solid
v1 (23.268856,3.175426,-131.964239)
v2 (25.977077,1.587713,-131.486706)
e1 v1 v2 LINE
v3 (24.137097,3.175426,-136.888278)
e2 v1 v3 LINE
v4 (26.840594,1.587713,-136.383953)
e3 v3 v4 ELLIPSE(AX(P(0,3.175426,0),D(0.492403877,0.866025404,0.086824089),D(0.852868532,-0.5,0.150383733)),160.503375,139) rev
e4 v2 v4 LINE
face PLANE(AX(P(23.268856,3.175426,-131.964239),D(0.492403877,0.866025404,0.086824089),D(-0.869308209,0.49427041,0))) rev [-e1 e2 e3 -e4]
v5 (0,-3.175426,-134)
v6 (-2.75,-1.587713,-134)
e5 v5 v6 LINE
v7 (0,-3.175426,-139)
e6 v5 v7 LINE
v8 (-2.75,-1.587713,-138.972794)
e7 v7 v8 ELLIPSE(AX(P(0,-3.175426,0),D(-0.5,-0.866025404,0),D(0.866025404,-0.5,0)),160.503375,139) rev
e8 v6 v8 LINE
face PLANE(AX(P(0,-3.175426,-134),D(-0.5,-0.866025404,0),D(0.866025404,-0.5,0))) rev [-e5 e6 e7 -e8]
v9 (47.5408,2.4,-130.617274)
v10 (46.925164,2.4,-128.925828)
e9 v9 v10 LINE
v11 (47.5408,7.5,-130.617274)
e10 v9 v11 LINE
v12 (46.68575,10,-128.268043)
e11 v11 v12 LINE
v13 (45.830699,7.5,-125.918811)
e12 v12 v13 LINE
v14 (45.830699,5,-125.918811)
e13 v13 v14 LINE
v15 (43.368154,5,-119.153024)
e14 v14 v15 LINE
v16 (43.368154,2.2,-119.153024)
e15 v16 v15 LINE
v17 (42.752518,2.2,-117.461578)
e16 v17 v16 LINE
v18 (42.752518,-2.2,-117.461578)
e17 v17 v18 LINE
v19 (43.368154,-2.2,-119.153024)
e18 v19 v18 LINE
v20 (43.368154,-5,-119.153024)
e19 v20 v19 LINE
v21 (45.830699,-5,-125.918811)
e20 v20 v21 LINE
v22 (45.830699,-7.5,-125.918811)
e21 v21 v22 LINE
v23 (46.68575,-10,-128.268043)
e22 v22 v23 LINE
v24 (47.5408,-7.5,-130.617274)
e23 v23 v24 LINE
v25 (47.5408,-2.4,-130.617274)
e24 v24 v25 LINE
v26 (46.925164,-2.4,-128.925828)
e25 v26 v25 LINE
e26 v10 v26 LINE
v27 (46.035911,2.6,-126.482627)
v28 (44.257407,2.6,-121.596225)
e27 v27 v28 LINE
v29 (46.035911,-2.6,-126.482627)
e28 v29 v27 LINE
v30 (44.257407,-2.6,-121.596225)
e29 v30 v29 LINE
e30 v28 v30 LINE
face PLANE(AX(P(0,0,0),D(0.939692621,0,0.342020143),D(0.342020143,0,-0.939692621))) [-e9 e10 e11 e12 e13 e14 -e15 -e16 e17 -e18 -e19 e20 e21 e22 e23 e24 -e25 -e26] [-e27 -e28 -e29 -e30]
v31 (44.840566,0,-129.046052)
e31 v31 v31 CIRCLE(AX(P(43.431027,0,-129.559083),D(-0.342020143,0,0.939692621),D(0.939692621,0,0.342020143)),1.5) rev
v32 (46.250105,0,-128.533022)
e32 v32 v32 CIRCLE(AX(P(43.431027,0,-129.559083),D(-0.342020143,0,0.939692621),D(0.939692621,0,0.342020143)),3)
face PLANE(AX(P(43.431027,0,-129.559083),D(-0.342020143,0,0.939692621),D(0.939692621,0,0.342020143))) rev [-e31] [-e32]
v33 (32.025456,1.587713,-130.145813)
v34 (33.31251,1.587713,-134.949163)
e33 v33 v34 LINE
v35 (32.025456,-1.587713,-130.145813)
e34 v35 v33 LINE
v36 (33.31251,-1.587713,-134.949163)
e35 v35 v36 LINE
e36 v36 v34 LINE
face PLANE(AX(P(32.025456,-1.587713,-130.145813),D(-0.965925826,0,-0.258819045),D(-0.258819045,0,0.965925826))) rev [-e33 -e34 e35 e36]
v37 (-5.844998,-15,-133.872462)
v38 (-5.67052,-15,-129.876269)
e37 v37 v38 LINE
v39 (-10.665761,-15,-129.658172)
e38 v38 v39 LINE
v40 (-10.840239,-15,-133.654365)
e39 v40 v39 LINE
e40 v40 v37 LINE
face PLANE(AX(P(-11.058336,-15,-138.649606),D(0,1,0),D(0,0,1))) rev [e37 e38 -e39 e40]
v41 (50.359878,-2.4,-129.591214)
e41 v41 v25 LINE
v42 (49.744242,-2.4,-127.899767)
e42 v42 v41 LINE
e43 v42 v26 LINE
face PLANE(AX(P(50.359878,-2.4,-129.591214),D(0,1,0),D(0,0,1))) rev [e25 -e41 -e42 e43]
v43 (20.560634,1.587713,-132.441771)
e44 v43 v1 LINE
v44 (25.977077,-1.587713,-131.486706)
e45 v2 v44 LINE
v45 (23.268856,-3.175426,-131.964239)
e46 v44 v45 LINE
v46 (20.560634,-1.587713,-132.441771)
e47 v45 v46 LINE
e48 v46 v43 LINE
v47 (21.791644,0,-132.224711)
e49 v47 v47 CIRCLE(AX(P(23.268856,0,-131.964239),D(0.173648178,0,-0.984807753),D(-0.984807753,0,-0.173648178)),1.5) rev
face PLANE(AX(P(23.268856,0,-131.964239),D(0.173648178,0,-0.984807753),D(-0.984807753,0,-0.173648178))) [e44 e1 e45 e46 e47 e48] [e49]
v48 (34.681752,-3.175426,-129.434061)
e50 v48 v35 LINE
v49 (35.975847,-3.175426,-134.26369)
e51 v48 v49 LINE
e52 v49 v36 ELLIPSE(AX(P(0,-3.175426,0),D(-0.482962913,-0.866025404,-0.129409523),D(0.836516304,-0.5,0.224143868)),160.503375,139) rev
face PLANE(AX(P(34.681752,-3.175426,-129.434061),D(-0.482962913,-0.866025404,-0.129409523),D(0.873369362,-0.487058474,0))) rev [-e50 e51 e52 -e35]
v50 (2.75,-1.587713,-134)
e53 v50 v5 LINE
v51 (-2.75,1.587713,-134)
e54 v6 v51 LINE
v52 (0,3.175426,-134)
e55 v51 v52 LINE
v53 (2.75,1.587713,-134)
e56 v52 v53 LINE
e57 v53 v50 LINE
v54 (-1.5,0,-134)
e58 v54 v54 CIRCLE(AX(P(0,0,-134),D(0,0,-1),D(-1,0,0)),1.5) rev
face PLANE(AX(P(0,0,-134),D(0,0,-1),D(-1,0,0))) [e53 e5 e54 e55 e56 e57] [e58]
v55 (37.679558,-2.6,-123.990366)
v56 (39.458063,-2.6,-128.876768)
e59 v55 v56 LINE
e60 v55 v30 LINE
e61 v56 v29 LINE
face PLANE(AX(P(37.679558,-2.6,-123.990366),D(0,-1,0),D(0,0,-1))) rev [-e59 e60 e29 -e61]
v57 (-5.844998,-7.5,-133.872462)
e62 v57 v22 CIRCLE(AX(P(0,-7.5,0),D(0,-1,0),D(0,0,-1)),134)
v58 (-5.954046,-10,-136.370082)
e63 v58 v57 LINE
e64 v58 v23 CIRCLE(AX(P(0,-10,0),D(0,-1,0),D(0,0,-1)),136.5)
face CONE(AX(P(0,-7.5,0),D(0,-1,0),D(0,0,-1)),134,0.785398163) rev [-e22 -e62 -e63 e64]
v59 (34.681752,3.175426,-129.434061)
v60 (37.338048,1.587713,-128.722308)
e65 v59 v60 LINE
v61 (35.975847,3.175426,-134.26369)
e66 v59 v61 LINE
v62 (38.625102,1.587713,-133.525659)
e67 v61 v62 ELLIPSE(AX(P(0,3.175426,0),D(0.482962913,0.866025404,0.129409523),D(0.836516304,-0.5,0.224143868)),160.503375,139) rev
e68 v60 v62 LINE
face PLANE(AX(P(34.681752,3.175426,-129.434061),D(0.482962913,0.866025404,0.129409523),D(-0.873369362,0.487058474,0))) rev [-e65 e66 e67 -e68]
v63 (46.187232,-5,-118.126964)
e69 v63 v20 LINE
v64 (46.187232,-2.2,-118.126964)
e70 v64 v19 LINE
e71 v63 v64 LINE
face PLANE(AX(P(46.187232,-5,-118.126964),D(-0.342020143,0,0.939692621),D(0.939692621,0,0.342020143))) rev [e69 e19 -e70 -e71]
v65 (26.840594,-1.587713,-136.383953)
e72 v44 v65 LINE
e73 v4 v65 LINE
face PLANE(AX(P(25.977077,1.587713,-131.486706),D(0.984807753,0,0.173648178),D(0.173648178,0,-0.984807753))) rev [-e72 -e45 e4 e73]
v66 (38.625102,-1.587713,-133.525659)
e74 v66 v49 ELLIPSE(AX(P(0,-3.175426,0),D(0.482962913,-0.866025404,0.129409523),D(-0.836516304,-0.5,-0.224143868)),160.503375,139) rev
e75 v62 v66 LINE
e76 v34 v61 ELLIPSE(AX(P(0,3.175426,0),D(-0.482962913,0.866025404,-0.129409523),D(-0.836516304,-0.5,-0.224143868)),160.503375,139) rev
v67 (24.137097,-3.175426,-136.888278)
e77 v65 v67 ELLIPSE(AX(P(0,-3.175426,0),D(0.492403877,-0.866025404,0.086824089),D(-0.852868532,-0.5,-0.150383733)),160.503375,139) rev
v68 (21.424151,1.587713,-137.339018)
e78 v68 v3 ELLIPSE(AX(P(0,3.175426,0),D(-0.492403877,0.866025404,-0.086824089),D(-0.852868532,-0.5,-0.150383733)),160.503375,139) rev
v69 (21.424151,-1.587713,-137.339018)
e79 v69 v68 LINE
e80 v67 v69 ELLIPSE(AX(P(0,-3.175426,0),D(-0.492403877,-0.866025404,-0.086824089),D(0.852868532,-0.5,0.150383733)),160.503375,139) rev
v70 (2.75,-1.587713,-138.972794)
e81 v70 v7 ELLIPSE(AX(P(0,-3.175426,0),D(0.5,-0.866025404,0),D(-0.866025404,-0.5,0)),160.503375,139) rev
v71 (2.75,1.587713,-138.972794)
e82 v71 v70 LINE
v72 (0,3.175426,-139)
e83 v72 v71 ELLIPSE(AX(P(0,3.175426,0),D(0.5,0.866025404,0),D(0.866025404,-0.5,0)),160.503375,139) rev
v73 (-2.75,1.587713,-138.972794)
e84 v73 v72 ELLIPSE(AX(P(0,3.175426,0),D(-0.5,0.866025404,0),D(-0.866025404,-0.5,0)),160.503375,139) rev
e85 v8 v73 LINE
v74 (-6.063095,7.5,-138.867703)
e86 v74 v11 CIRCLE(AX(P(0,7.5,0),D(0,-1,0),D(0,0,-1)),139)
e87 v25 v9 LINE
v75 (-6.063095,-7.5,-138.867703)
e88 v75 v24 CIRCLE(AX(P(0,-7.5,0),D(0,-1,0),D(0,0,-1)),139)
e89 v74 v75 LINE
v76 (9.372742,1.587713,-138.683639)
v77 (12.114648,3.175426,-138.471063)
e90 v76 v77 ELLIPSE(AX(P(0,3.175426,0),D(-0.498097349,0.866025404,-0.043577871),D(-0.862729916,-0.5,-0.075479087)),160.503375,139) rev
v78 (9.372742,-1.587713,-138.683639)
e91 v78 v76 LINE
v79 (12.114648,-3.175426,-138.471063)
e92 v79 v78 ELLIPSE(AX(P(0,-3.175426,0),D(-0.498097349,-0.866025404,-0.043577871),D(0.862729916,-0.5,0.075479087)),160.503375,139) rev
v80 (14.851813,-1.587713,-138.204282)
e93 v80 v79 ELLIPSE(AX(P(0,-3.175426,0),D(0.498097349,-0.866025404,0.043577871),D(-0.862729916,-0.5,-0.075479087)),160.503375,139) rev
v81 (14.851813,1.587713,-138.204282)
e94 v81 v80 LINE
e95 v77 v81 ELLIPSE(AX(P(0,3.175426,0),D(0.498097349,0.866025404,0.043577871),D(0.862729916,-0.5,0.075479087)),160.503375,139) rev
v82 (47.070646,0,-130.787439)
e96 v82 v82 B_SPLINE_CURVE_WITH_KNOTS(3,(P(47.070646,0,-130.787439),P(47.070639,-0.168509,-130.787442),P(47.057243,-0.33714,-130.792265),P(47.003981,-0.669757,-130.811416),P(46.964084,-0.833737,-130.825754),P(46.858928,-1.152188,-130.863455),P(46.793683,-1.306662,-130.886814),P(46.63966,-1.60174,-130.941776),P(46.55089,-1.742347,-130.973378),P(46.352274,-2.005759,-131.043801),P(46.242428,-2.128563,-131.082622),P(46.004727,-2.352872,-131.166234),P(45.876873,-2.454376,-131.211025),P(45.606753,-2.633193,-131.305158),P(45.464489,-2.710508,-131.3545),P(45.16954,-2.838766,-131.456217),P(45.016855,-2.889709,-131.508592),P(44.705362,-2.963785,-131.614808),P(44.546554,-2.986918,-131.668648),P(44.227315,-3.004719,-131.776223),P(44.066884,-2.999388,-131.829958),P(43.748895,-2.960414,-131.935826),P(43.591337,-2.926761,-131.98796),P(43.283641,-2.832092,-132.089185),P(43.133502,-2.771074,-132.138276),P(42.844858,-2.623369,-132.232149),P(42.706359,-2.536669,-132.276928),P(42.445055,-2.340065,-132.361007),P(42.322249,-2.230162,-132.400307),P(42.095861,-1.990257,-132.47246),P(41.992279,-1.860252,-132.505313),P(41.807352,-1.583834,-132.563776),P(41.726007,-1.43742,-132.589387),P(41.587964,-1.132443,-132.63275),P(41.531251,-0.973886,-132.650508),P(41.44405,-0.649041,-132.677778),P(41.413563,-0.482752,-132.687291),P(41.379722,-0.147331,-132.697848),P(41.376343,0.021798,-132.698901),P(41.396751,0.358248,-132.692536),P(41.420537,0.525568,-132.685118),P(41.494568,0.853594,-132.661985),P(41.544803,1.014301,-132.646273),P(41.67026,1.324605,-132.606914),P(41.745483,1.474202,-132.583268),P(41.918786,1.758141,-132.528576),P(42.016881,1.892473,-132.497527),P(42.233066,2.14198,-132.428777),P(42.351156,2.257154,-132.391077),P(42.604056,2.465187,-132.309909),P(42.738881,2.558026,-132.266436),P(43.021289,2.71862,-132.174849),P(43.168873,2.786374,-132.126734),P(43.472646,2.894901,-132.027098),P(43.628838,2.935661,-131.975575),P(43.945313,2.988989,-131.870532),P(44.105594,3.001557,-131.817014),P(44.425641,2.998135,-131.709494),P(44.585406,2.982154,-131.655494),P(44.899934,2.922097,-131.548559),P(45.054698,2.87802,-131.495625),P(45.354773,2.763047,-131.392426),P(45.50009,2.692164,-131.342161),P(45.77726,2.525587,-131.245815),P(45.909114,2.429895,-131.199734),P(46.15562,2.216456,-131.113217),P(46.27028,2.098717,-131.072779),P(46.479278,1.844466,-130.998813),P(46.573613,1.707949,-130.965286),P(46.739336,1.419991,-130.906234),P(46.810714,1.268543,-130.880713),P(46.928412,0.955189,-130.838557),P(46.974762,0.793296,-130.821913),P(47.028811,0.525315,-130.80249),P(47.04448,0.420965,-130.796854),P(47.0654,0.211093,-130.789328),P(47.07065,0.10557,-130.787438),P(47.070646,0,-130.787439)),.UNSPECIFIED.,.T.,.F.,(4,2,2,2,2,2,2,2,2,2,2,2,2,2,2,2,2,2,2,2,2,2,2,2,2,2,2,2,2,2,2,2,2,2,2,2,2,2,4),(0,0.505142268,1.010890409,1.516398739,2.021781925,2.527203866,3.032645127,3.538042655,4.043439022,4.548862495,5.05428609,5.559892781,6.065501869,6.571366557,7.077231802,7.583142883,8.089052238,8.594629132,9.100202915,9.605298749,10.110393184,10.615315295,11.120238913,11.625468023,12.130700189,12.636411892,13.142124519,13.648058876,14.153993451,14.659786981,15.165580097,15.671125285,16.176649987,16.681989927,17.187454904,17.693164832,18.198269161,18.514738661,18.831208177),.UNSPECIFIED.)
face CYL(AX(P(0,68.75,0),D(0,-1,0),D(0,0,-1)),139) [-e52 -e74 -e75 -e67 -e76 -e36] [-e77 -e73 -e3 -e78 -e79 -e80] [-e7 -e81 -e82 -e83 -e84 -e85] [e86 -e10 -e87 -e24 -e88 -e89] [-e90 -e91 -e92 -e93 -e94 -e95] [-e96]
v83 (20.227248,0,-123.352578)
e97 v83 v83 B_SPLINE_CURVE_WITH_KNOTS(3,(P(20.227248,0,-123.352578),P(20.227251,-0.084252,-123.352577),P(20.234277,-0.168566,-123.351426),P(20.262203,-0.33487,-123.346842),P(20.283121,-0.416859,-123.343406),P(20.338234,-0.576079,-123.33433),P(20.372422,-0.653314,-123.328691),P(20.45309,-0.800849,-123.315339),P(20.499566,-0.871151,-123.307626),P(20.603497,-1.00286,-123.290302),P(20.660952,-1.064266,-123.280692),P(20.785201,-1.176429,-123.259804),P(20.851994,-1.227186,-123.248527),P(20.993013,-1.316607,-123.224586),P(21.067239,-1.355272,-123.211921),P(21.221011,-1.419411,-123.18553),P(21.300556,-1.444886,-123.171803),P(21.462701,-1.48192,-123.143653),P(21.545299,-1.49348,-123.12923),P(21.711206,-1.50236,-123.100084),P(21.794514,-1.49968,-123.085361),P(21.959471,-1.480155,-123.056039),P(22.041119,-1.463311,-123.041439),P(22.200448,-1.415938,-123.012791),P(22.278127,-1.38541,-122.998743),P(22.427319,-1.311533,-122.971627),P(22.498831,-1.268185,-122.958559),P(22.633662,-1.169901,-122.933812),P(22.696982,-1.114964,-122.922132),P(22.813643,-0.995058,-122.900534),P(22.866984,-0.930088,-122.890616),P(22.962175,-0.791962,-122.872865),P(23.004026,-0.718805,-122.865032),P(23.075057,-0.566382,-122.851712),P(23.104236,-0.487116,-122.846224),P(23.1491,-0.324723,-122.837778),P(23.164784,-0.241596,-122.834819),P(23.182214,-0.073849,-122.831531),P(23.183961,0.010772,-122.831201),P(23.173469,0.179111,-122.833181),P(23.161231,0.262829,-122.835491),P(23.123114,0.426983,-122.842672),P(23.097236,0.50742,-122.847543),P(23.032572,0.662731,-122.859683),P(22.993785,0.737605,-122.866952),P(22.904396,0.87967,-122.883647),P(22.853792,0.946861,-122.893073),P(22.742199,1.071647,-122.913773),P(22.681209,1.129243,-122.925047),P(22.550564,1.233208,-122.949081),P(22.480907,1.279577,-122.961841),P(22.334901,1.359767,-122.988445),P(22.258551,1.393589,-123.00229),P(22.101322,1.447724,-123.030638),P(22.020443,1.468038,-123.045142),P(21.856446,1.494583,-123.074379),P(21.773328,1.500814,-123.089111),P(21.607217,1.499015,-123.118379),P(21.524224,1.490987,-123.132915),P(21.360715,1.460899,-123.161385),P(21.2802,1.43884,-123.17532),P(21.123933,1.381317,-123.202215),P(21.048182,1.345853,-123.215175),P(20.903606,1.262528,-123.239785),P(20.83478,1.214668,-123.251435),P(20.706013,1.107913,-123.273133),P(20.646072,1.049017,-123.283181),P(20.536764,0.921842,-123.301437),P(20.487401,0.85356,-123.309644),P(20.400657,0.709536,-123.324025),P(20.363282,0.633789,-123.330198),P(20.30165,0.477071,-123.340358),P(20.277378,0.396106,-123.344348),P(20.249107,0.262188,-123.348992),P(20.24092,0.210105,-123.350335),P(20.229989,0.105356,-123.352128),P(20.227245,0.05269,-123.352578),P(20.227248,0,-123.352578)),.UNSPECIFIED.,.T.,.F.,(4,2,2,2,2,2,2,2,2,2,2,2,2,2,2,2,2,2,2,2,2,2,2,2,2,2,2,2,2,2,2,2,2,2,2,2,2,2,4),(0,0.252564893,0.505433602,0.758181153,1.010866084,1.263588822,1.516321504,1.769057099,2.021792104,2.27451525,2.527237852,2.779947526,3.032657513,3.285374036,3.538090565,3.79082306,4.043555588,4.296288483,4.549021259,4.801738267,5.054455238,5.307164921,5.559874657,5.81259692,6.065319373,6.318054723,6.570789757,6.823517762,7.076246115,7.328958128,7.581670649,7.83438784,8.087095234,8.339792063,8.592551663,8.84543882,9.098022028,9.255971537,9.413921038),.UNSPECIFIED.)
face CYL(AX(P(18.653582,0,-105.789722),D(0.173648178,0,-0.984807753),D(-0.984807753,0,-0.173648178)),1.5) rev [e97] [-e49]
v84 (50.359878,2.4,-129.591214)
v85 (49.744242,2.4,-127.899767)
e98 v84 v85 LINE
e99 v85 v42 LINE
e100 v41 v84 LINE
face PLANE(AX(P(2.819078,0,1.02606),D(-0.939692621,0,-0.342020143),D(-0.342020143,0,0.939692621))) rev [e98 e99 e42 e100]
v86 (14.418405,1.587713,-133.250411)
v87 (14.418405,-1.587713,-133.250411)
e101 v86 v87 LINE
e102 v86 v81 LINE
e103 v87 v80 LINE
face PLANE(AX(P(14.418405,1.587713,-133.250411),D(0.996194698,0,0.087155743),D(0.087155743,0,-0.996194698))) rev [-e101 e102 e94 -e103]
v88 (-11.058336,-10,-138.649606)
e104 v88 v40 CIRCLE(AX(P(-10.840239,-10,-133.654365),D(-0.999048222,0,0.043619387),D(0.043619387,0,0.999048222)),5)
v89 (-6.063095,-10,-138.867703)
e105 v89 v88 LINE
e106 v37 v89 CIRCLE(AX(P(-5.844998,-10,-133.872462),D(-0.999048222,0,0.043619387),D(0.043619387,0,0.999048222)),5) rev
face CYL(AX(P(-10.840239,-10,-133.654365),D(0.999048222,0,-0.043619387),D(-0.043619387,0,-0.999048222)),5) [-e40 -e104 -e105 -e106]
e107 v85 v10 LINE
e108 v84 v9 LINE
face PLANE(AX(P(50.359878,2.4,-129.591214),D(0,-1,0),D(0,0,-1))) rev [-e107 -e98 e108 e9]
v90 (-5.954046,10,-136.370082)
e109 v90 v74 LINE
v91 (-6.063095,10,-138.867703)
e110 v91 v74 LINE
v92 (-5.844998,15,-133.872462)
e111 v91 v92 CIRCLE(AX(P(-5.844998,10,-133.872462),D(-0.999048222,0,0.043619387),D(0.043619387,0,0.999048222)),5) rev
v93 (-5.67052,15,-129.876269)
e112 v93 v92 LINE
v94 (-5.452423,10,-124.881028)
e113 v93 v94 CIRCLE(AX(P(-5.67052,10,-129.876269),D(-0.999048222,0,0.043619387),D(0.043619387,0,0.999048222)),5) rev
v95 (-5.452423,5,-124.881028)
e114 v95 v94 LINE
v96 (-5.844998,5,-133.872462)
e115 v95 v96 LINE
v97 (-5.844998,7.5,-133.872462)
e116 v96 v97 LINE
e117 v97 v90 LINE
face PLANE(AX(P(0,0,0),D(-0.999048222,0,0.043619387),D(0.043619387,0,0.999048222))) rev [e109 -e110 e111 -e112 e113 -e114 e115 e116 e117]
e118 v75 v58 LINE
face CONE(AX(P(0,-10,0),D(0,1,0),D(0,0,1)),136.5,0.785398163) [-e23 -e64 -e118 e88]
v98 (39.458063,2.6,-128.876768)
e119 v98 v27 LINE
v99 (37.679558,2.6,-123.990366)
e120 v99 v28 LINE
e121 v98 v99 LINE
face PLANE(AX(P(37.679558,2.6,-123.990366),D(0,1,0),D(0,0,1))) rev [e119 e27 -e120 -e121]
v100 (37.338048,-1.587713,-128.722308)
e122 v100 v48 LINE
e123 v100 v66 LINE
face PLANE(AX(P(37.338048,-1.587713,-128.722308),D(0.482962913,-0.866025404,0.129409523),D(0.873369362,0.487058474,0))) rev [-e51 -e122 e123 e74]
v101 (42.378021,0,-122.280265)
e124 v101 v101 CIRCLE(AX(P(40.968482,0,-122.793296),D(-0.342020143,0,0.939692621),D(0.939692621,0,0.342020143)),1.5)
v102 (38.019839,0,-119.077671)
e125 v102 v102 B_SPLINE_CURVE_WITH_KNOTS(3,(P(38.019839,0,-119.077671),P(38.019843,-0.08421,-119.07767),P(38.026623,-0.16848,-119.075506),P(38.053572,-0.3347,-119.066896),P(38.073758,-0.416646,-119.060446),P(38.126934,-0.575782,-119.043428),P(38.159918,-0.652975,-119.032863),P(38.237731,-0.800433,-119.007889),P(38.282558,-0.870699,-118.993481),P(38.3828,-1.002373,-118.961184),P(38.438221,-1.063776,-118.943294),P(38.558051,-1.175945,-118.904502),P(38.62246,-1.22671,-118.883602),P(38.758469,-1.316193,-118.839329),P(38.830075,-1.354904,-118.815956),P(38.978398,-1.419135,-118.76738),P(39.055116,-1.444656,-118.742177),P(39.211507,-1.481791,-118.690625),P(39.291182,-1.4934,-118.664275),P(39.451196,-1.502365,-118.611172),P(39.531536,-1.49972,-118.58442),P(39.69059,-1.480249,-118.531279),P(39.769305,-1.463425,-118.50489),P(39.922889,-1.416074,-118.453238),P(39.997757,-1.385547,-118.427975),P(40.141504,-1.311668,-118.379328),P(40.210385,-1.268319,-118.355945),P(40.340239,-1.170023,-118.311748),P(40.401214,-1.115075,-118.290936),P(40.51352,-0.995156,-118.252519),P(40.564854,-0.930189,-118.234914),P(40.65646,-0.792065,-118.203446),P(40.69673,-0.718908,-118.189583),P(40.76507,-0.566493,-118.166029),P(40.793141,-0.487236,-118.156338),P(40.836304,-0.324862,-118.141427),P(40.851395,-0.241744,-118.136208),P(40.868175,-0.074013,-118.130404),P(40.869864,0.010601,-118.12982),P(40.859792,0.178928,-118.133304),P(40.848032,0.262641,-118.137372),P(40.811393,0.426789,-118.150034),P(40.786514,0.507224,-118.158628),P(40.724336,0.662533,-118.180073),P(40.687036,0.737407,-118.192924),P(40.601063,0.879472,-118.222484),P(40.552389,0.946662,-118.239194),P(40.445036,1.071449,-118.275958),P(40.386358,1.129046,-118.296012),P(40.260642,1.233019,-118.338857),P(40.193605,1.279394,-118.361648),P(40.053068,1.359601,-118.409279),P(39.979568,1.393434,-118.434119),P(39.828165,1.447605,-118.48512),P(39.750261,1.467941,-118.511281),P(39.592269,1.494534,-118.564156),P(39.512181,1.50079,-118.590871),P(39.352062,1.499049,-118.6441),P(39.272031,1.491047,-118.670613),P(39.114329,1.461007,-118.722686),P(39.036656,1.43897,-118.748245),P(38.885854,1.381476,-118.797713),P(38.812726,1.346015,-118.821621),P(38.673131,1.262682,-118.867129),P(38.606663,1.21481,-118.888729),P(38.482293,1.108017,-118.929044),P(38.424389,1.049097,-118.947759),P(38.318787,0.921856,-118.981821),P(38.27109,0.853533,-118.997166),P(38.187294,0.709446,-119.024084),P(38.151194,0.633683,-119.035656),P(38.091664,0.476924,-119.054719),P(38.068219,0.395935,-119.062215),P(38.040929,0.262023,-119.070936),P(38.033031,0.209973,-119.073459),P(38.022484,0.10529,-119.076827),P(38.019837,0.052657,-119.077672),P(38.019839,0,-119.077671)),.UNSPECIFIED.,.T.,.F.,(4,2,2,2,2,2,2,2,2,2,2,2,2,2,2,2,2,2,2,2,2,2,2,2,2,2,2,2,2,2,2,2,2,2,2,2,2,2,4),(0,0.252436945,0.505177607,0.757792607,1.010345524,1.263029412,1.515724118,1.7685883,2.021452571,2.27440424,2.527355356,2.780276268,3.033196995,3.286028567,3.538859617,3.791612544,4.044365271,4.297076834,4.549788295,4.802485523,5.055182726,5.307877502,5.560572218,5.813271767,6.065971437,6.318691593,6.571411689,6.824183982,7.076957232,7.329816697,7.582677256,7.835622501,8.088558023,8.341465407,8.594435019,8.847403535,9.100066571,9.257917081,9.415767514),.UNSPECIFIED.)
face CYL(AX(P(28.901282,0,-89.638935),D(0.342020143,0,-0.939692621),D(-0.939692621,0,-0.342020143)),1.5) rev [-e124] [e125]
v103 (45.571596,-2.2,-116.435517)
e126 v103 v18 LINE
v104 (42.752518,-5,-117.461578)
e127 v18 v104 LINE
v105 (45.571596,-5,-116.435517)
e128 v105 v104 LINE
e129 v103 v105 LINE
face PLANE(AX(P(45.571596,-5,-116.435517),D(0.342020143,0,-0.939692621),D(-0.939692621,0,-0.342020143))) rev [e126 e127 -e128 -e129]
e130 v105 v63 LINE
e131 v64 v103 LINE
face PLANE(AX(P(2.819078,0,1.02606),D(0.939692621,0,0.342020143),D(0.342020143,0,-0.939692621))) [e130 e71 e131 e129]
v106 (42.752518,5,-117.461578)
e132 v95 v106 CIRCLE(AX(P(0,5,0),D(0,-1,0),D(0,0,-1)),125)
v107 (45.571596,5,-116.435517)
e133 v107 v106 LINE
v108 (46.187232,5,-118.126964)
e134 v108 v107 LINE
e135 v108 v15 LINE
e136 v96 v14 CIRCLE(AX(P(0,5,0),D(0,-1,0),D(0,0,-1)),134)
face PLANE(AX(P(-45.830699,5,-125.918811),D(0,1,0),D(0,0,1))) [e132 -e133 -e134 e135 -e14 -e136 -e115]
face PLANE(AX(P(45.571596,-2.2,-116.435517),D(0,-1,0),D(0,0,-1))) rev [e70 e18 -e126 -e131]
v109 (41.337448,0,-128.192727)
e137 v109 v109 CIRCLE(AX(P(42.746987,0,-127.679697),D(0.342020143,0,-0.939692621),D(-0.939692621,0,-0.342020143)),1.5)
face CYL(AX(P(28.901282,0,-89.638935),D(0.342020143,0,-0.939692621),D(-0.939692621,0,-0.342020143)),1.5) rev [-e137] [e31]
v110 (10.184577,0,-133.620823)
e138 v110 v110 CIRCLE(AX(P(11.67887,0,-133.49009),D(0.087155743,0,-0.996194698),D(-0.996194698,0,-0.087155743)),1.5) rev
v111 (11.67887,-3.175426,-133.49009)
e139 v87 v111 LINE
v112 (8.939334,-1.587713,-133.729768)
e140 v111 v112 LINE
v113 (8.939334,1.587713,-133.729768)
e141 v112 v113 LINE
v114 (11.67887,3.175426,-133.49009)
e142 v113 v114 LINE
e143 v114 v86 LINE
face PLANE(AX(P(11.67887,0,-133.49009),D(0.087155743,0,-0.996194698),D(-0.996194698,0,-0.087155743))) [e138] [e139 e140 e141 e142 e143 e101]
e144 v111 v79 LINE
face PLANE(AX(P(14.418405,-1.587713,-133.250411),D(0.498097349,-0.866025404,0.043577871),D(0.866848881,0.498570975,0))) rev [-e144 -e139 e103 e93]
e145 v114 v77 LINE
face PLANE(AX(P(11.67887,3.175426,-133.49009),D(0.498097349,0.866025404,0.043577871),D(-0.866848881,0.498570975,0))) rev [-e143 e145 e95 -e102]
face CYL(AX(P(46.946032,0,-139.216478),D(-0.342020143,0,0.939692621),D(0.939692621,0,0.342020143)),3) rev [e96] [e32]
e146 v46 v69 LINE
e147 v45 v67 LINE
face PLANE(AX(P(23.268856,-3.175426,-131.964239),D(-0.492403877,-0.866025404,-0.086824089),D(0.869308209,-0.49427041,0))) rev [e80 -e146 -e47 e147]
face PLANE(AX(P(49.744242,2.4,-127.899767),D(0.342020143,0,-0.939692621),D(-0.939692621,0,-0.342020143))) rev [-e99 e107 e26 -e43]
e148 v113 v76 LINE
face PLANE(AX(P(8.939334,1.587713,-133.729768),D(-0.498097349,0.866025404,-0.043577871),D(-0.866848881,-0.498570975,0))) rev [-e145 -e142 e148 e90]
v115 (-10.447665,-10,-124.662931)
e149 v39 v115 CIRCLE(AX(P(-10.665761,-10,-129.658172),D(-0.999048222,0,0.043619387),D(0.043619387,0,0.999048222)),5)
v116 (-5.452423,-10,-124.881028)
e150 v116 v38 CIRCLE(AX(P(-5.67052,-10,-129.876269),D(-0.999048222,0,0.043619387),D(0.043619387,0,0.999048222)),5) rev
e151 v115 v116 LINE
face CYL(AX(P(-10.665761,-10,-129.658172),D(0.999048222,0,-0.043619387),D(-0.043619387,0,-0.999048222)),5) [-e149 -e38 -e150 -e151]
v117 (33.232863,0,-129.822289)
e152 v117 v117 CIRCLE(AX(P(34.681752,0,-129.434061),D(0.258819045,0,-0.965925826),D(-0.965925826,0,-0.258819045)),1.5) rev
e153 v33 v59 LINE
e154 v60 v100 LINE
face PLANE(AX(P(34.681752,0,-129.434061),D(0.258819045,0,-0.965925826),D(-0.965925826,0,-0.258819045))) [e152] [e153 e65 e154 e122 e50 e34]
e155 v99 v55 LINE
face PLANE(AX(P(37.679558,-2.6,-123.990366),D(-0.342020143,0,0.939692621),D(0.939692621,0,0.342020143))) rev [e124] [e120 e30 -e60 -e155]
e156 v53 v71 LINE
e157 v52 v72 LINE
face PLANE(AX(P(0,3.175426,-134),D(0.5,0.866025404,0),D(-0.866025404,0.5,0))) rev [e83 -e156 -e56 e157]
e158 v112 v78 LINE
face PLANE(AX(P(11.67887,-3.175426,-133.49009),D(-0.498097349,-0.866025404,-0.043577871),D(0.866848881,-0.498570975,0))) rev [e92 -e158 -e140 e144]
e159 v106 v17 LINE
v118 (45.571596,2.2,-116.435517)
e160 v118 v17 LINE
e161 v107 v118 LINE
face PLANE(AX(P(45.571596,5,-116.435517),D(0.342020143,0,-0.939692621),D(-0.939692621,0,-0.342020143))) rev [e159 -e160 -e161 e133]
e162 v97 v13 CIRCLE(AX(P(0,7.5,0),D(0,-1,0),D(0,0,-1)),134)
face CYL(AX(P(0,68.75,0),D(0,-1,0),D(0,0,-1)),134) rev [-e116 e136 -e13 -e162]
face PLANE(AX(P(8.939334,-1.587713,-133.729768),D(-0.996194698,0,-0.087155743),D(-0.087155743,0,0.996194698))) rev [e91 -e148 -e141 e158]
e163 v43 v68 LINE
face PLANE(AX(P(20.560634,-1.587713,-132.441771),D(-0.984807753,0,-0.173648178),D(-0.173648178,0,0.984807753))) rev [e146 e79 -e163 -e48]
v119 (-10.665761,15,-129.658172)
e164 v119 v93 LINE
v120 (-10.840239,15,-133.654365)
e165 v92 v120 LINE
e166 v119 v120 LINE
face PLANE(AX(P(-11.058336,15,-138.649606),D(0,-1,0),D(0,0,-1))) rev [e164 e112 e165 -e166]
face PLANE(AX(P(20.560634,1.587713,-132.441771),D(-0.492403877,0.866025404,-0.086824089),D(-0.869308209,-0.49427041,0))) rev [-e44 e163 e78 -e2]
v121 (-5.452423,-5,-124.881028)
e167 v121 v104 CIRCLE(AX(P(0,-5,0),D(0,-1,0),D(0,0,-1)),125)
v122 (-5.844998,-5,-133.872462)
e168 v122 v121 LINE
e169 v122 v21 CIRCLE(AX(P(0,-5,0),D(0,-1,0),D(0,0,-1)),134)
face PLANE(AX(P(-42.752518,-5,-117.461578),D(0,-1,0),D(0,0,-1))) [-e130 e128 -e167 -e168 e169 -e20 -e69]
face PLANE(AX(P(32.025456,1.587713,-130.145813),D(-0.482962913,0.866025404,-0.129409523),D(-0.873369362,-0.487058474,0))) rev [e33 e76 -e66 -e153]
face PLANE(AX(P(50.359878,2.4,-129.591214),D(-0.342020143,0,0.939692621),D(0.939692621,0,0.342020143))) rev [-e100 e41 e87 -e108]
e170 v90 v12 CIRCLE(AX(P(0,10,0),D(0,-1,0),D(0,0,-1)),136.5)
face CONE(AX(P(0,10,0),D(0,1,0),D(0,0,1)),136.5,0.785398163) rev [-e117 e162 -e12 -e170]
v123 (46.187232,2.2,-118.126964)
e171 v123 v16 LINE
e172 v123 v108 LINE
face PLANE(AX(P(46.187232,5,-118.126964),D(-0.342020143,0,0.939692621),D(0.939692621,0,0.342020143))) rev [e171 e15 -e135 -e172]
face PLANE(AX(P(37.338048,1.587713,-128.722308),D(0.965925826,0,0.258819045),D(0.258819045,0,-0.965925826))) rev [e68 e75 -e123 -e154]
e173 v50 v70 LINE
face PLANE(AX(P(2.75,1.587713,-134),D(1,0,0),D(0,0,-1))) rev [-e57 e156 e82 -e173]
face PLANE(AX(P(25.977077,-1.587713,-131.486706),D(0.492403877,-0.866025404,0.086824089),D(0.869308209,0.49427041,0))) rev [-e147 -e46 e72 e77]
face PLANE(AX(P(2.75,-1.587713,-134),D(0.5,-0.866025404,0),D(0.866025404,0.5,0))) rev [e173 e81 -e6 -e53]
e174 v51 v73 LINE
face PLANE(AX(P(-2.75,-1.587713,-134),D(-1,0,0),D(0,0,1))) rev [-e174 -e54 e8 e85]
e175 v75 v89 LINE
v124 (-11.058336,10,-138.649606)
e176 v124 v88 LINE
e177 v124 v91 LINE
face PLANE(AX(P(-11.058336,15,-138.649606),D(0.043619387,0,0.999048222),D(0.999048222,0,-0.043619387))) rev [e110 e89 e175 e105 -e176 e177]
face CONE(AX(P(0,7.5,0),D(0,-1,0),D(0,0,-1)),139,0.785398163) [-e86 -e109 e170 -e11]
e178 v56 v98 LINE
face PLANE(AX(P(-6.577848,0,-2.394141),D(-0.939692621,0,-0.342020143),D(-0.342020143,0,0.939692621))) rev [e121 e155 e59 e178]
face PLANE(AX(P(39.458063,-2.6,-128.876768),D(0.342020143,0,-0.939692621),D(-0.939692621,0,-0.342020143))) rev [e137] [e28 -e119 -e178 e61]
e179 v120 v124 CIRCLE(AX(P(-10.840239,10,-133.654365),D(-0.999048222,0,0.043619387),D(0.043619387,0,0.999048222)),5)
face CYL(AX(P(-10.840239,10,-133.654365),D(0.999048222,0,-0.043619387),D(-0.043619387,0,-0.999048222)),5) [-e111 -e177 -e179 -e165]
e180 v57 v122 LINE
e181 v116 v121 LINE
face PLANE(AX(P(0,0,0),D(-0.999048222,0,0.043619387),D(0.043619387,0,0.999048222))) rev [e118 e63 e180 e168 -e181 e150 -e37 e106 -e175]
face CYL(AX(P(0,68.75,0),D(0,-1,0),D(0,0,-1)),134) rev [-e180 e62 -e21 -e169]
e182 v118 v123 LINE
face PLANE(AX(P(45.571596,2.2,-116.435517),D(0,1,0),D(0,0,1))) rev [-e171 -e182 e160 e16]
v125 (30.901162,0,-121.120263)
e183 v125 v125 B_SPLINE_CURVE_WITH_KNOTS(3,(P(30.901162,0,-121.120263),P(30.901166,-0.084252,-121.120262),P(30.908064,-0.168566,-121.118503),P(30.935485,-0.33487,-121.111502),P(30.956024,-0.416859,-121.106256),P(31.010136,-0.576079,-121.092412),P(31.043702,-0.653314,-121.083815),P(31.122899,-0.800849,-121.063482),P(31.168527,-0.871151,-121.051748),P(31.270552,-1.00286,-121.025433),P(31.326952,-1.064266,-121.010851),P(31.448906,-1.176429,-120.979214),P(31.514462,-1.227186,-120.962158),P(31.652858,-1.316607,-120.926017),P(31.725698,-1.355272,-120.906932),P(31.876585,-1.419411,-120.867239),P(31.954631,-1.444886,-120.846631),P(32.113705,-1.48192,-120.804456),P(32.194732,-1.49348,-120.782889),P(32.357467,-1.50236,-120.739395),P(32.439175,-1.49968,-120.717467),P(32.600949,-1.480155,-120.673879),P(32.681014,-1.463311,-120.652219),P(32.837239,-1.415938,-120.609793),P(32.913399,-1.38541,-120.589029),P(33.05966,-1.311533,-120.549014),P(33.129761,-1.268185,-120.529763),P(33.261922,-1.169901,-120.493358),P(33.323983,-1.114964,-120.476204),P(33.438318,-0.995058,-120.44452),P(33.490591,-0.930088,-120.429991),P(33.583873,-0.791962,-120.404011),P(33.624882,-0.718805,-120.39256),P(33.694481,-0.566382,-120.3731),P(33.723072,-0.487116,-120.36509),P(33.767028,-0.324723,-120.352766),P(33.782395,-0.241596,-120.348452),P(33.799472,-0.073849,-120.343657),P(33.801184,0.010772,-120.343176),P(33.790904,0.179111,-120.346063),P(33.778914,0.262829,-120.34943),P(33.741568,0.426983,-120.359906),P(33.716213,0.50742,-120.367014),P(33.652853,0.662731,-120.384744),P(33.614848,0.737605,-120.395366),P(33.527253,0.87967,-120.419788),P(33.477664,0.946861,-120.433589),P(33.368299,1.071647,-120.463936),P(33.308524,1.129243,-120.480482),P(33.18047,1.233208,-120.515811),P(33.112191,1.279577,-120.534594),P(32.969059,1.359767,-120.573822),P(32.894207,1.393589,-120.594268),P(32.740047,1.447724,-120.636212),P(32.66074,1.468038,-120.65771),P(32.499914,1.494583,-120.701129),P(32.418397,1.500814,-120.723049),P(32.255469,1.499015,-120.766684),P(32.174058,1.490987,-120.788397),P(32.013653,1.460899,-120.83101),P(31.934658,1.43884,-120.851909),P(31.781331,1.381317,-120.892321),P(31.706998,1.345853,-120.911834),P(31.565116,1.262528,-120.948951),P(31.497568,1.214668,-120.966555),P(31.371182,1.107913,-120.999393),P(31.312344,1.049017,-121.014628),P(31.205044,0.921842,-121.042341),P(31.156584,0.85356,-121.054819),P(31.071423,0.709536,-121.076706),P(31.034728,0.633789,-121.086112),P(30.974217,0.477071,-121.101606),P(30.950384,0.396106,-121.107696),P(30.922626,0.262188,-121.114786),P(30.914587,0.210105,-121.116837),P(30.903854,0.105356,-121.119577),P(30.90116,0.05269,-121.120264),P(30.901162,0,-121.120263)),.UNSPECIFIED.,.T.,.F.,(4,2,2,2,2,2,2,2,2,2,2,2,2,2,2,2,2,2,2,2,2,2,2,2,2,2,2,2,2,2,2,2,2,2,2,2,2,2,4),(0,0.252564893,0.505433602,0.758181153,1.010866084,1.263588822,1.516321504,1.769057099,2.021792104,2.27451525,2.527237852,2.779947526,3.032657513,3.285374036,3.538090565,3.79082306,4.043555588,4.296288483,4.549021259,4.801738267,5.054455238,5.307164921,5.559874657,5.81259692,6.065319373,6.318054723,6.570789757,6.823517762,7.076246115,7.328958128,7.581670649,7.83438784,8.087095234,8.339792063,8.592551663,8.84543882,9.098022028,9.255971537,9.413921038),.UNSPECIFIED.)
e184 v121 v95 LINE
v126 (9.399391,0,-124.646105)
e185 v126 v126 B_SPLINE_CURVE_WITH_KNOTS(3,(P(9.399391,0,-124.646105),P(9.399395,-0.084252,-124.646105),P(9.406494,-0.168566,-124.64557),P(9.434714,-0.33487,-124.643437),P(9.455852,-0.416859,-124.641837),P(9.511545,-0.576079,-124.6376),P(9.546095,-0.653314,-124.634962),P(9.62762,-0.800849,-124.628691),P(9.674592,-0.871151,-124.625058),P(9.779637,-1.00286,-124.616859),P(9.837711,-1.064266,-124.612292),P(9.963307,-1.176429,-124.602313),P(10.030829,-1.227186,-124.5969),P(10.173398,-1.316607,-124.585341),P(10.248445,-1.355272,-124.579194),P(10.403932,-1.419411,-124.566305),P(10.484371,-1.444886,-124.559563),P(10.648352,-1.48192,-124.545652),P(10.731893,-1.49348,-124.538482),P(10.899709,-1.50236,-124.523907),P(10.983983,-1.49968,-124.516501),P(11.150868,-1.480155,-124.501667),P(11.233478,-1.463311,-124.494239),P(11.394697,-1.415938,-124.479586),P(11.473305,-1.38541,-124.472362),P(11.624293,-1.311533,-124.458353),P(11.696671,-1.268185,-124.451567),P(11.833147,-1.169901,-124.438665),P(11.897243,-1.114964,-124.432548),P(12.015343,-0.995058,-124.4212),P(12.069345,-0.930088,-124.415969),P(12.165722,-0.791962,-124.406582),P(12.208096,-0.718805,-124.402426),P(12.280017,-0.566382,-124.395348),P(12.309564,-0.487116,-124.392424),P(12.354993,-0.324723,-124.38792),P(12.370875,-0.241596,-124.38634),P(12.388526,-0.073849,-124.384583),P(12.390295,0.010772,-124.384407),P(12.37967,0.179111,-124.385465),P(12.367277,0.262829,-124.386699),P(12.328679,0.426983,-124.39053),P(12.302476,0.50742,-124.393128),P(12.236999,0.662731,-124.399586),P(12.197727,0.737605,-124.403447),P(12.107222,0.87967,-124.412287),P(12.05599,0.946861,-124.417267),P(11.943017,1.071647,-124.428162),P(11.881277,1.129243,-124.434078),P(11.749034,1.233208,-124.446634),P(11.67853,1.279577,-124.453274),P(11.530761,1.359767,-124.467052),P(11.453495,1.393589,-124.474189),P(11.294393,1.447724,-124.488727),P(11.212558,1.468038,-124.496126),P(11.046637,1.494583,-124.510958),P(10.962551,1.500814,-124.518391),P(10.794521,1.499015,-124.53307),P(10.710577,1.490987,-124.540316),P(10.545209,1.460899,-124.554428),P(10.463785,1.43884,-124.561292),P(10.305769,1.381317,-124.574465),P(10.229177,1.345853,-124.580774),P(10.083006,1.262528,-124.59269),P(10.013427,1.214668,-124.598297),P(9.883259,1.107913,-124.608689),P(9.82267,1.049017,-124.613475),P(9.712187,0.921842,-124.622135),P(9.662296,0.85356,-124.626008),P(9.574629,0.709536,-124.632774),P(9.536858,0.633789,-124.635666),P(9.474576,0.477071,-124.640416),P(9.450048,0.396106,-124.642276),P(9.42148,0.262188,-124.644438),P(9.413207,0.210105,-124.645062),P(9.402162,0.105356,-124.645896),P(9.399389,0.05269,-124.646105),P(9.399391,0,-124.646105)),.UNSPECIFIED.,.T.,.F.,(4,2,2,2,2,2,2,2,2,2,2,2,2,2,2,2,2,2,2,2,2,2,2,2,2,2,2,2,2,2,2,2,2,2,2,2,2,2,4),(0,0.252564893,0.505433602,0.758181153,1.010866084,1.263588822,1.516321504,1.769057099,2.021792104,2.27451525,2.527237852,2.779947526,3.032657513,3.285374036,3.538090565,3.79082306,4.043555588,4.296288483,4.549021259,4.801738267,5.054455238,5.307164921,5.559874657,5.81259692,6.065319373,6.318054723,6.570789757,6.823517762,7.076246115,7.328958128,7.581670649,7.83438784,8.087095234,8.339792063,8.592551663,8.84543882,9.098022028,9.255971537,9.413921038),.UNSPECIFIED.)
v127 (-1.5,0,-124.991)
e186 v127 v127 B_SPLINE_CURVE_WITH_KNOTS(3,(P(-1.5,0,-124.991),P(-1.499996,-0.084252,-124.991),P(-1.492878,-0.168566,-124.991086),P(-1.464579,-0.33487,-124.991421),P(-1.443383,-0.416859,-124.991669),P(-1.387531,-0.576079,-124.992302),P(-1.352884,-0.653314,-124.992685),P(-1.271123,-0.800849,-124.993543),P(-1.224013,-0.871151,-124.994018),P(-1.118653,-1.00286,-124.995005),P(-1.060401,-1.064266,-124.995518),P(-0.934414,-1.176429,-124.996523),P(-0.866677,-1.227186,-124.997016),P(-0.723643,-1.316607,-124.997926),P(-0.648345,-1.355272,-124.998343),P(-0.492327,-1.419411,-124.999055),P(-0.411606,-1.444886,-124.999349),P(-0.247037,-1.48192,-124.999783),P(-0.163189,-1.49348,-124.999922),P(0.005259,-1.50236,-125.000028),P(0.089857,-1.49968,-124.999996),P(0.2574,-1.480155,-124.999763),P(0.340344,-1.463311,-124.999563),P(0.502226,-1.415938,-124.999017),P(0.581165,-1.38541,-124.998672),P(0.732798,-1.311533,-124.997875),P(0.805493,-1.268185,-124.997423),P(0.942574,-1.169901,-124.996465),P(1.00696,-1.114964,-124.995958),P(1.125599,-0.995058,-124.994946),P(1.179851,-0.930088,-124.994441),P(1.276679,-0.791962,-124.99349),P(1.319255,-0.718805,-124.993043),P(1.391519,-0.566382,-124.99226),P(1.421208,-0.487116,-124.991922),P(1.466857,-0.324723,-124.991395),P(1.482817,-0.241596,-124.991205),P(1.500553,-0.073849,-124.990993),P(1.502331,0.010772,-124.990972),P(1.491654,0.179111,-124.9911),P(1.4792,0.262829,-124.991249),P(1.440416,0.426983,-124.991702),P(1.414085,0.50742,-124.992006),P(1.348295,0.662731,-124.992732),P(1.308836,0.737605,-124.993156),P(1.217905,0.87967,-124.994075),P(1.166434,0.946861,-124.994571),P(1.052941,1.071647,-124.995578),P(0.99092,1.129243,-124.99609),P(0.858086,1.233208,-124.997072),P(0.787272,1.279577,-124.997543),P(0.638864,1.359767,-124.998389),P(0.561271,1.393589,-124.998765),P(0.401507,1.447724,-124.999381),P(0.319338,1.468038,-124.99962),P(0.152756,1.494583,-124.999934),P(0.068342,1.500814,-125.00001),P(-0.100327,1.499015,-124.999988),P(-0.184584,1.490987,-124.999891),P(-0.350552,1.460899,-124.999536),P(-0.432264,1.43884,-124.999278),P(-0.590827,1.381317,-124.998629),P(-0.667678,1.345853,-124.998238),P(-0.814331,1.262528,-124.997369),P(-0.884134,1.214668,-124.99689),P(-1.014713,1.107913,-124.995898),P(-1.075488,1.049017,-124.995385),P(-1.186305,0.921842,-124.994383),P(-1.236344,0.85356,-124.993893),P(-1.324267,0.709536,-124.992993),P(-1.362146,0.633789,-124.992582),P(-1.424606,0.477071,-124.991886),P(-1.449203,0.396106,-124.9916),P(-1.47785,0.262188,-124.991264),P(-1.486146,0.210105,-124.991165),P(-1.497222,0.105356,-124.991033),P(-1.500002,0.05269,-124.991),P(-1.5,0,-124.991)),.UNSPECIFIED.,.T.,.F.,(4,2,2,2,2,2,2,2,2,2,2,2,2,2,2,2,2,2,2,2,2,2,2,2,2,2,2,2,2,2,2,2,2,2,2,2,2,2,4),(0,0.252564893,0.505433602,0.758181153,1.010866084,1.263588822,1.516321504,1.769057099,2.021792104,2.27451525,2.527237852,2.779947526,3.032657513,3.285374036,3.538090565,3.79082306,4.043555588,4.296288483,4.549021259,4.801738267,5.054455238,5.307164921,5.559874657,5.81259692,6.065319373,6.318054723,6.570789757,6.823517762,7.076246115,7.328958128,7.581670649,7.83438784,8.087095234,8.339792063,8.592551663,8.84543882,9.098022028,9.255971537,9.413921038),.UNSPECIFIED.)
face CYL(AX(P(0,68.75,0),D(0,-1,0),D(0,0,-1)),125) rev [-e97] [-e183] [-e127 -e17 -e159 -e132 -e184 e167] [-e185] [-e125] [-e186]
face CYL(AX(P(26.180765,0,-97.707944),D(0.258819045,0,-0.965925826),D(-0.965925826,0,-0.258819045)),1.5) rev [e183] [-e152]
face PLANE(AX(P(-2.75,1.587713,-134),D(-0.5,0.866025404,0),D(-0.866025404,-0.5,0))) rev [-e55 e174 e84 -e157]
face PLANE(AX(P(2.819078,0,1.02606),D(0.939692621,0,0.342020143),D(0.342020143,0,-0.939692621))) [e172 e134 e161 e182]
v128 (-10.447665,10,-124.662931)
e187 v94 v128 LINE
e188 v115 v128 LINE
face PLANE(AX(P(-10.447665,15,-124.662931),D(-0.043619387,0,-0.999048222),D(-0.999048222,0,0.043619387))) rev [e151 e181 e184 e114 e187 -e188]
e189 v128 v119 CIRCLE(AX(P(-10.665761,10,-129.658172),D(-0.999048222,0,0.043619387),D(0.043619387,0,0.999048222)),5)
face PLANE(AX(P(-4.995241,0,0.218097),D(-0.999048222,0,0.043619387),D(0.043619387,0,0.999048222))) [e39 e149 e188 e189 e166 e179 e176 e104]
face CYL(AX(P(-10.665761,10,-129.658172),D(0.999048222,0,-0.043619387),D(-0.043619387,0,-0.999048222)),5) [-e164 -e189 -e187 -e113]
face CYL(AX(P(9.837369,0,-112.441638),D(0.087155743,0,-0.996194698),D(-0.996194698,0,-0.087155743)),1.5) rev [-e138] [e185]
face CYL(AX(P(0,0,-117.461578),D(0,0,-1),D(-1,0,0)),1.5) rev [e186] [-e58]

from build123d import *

# Parameters (mm, degrees)
REVOLVE_1_ANGLE          = 40
SKETCH_3_W               = 5.2
SKETCH_3_H               = 5.2
CUT_EXTRUDE_1_DEPTH      = 7
CUT_EXTRUDE_2_DEPTH      = 94.967026614
CUT_EXTRUDE_2_DEPTH_BACK = 94.967026614
SKETCH_5_R               = 1.5
CUT_EXTRUDE_START        = -2
SKETCH_6_R               = 3
CUT_EXTRUDE_3_DEPTH      = 93.938324905
SKETCH_12_R              = 1.5
CUT_EXTRUDE_5_DEPTH      = 54.141615619
CUT_EXTRUDE_6_DEPTH      = 5
PATTERN_CIRCULAR_1_COUNT = 4
PATTERN_CIRCULAR_1_ANGLE = 15
F_1_THE_OTHER_WAY_COUNT  = 4
F_1_THE_OTHER_WAY_ANGLE  = 15
SKETCH_9_W               = 1.8
SKETCH_9_H               = 4.8
SKETCH_9_H_2             = 2.8
EXTRUDE_2_DEPTH          = 3
SKETCH_10_W              = 52.448370613
SKETCH_10_H              = 39.953744926
CUT_EXTRUDE_4_DEPTH      = 149.179341739
SKETCH_11_W              = 14
SKETCH_11_H              = 30
EXTRUDE_3_DEPTH          = 5
FILLET_1_R               = 5


# Read off the part's stored shape, not the designer's step: 旋转1
with BuildPart() as part:
    # 旋转1 outline → 旋转1 (revolve)
    with BuildSketch(Plane(origin=(0, 0, 0), x_dir=(0.3420201433256701, 0, -0.9396926207859079), z_dir=(0.9396926207859079, 0, 0.3420201433256701))):
        Polygon((134, 5), (125, 5), (125, -5), (134, -5), (134, -7.5), (136.5, -10), (139, -7.5), (139, 7.5), (136.5, 10), (134, 7.5), align=None)
    revolve(axis=Axis((0, 0, 0), (0, 1, 0)), revolution_arc=REVOLVE_1_ANGLE)

    # 草图3 → 切除-拉伸1 (cut)
    with BuildSketch(Plane(origin=(0, 0, 0), x_dir=(0.34202014332566943, 0, -0.9396926207859081), z_dir=(0.9396926207859081, 0, 0.34202014332566943))):
        with Locations((132, 0)):
            Rectangle(SKETCH_3_W, SKETCH_3_H)
    extrude(amount=-CUT_EXTRUDE_1_DEPTH, mode=Mode.SUBTRACT)

    # 草图5 → 切除-拉伸2 (cut, two sides: drawn at the far end of the back side and taken through both)
    with BuildSketch(Plane(origin=(44.257406546, 0, -121.59622513), x_dir=(-0.9396926207859081, 0, -0.3420201433256695), z_dir=(0.3420201433256695, 0, -0.9396926207859081)).offset(-CUT_EXTRUDE_2_DEPTH_BACK)):
        with Locations((3.5, 0)):
            Circle(SKETCH_5_R)
    extrude(amount=CUT_EXTRUDE_2_DEPTH + CUT_EXTRUDE_2_DEPTH_BACK, mode=Mode.SUBTRACT)

    # 草图6 → 切除-拉伸3 (cut, through all)
    with BuildSketch(Plane(origin=(46.035911292, 0, -126.482626758), x_dir=(0.9396926207859081, 0, 0.3420201433256695), z_dir=(-0.3420201433256695, 0, 0.9396926207859081)).offset(CUT_EXTRUDE_START)):
        with Locations((-3.5, 0)):
            Circle(SKETCH_6_R)
    extrude(amount=-CUT_EXTRUDE_3_DEPTH, mode=Mode.SUBTRACT)

    # 草图12 → 切除-拉伸5 (cut, through all)
    with BuildSketch(Plane(origin=(0, 0, -139), x_dir=(-1, 0, 0), z_dir=(0, 0, -1))):
        Circle(SKETCH_12_R)
    cut_extrude_5 = extrude(amount=-CUT_EXTRUDE_5_DEPTH, mode=Mode.SUBTRACT)

    # 草图13 → 切除-拉伸6 (cut)
    with BuildSketch(Plane(origin=(0, 0, -139), x_dir=(-1, 0, 0), z_dir=(0, 0, -1))):
        Polygon((0, -3.175426481), (2.75, -1.58771324), (2.75, 1.58771324), (0, 3.175426481), (-2.75, 1.58771324), (-2.75, -1.58771324), align=None)
    cut_extrude_6 = extrude(amount=-CUT_EXTRUDE_6_DEPTH, mode=Mode.SUBTRACT)

    # 阵列(圆周)1: 切除-拉伸5, 切除-拉伸6 ×4 about axis
    pattern_circular_1_axis = Axis((0, 0, 0), (0, 1, 0))
    add([cut_extrude_5.rotate(pattern_circular_1_axis, i * PATTERN_CIRCULAR_1_ANGLE / (PATTERN_CIRCULAR_1_COUNT - 1)) for i in range(1, PATTERN_CIRCULAR_1_COUNT)], mode=Mode.SUBTRACT)
    add([cut_extrude_6.rotate(pattern_circular_1_axis, i * PATTERN_CIRCULAR_1_ANGLE / (PATTERN_CIRCULAR_1_COUNT - 1)) for i in range(1, PATTERN_CIRCULAR_1_COUNT)], mode=Mode.SUBTRACT)

    # 1 the other way: 切除-拉伸5, 切除-拉伸6 ×4 about axis
    f_1_the_other_way_axis = Axis((0, 0, 0), (0, -1, 0))
    add([cut_extrude_5.rotate(f_1_the_other_way_axis, i * F_1_THE_OTHER_WAY_ANGLE / (F_1_THE_OTHER_WAY_COUNT - 1)) for i in range(1, F_1_THE_OTHER_WAY_COUNT)], mode=Mode.SUBTRACT)
    add([cut_extrude_6.rotate(f_1_the_other_way_axis, i * F_1_THE_OTHER_WAY_ANGLE / (F_1_THE_OTHER_WAY_COUNT - 1)) for i in range(1, F_1_THE_OTHER_WAY_COUNT)], mode=Mode.SUBTRACT)

    # 草图9 → 凸台-拉伸2 (add)
    with BuildSketch(Plane(origin=(0, 0, 0), x_dir=(0.34202014332566943, 0, -0.9396926207859082), z_dir=(0.9396926207859082, 0, 0.34202014332566943))):
        with Locations((138.1, 0)):
            Rectangle(SKETCH_9_W, SKETCH_9_H)
        with Locations((125.9, 3.6)):
            Rectangle(SKETCH_9_W, SKETCH_9_H_2)
        with Locations((125.9, -3.6)):
            Rectangle(SKETCH_9_W, SKETCH_9_H_2)
    extrude(amount=EXTRUDE_2_DEPTH)

    # 草图10 → 切除-拉伸4 (cut, through all)
    with BuildSketch(Plane(origin=(0, 0, 0), x_dir=(0, -1, 0), z_dir=(0.9990482215818578, 0, -0.04361938736533606))):
        with Locations((1.816079314, 125.001454628)):
            Rectangle(SKETCH_10_W, SKETCH_10_H)
    extrude(amount=-CUT_EXTRUDE_4_DEPTH, mode=Mode.SUBTRACT)

    # 草图11 → 凸台-拉伸3 (add)
    with BuildSketch(Plane(origin=(0, 0, 0), x_dir=(0.043619387365336076, 0, 0.9990482215818578), z_dir=(-0.9990482215818577, 0, 0.04361938736533607))):
        with Locations((-132, 0)):
            Rectangle(SKETCH_11_W, SKETCH_11_H)
    extrude(amount=EXTRUDE_3_DEPTH)

    # 圆角1
    fillet_1_edges = [part.edges().sort_by_distance(p)[0] for p in [
        (-8.560715398, 15, -138.758654331),
        (-8.560715398, -15, -138.758654331),
        (-7.950043975, -15, -124.771979229),
        (-7.950043975, 15, -124.771979229),
    ]]
    fillet(fillet_1_edges, radius=FILLET_1_R)


solid = part.part
